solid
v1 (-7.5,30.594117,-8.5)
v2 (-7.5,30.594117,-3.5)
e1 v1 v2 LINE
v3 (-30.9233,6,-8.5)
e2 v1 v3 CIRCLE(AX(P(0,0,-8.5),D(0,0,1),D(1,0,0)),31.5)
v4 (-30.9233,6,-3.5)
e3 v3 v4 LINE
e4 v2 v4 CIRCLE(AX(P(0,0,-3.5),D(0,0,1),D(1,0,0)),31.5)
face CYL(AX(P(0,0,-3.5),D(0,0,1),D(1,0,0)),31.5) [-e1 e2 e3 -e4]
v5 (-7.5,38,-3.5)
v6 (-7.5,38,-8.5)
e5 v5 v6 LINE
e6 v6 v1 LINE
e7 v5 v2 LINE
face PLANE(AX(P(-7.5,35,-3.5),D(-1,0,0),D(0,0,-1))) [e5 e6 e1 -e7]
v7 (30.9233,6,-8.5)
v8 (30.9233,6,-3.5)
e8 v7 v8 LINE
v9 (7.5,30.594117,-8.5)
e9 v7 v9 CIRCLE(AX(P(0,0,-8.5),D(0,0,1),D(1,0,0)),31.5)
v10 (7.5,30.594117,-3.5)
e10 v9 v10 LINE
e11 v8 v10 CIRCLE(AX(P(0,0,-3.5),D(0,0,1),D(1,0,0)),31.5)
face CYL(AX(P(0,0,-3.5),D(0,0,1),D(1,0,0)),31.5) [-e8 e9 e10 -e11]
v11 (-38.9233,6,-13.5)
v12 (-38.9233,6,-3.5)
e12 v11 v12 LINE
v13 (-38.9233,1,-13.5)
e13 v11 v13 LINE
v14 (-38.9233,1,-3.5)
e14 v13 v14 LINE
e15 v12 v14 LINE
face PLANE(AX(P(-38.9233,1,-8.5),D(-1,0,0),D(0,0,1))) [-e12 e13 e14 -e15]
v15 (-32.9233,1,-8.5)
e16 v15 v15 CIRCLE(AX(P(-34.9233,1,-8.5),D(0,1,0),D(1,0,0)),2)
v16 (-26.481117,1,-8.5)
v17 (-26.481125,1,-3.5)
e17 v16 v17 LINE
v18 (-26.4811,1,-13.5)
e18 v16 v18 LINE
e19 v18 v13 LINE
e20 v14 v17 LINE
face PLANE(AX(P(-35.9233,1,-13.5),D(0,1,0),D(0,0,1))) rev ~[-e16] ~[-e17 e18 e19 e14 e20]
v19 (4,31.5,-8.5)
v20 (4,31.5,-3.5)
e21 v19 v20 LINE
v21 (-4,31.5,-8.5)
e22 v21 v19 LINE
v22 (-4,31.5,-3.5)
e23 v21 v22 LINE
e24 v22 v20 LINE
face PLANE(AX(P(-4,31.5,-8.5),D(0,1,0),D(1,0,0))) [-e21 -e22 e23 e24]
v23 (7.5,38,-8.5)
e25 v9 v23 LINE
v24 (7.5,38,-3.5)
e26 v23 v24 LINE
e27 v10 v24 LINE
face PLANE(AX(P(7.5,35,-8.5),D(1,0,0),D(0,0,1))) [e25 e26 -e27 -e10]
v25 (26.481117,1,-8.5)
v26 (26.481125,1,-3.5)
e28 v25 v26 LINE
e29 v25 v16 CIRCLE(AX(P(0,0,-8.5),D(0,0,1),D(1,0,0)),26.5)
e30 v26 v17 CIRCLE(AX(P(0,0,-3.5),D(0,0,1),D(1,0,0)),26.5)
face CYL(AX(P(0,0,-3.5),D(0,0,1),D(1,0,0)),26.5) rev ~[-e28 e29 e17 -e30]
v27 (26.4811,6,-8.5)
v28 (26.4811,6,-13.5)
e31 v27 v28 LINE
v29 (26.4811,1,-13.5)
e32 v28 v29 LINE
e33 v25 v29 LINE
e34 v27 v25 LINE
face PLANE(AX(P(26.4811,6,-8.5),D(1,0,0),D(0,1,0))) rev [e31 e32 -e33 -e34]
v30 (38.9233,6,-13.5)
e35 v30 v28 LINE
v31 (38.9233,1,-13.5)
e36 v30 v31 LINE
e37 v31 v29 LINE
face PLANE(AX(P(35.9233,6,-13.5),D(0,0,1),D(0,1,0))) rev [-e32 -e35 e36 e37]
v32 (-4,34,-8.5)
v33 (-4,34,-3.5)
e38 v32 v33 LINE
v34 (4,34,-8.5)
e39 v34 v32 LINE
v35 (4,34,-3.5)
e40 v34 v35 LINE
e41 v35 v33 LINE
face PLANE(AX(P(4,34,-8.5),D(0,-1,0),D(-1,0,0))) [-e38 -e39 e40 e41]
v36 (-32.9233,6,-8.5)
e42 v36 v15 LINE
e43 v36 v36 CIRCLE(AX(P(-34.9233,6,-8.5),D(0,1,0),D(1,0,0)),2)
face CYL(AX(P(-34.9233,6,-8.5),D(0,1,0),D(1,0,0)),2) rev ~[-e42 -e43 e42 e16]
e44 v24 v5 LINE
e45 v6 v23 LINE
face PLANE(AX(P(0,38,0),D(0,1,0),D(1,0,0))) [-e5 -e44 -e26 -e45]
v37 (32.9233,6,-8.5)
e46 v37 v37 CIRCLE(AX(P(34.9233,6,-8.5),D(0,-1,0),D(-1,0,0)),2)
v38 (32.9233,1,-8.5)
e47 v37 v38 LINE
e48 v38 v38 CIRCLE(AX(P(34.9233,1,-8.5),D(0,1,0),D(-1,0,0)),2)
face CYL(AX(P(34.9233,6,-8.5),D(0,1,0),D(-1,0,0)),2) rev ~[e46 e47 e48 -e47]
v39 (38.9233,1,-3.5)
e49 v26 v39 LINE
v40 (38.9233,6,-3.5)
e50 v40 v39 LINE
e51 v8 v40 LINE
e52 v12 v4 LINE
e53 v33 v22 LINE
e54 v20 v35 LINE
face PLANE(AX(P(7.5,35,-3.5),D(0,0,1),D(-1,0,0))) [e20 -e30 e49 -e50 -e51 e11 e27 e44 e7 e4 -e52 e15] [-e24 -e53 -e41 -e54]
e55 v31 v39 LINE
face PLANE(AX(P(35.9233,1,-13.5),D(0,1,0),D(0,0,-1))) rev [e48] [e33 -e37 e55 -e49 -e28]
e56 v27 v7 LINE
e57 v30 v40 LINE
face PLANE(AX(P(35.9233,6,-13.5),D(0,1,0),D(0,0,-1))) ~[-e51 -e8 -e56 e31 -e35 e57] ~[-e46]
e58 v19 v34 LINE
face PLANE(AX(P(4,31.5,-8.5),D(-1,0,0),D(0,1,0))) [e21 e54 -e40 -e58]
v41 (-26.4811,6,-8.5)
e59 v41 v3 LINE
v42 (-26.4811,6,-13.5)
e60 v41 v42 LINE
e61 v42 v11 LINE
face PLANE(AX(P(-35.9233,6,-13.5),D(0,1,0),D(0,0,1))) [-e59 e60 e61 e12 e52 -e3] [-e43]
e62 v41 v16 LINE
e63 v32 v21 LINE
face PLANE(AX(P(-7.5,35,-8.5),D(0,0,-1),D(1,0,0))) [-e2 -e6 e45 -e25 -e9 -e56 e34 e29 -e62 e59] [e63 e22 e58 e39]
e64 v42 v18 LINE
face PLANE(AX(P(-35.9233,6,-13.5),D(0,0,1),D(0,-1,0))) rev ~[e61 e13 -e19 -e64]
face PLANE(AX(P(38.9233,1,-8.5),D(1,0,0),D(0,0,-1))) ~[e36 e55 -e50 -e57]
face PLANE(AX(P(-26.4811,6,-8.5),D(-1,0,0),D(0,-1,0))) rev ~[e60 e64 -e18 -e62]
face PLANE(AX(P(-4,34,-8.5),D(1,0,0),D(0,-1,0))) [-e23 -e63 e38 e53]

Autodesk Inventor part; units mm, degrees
ref_plane "YZ Plane" through (0, 0, 0) normal (1, 0, 0) x (0, 1, 0)
ref_plane "Work Plane1" through (0, 0, -3.5) normal (0, 0, 1) x (1, 0, 0)
sketch "Sketch1" plane through (0, 0, -3.5) normal (0, 0, 1) x (1, 0, 0)
  circle A0 centre (0, 0) radius 26.5 projected
  circle A1 centre (0, 0) radius 31.5
  point P0 (0, 0)
  dimension "d1" = 5
extrude "Extrusion1" add sketch "Sketch1" against normal blind 5
sketch "Sketch5" plane through (0, 0, 0) normal (1, 0, 0) x (0, 1, 0)
  line L0 (6.0883, 0) -> (4.0883, 0)
  line L1 (4.0883, 0) -> (4.0883, -15.2563)
  line L2 (4.0883, -15.2563) -> (6.0883, -15.2563)
  line L3 (6.0883, -15.2563) -> (6.0883, 0)
  line L4 (-1, 2.6587) -> (1, 2.6587)
  line L5 (1, 2.6587) -> (1, -12.1151)
  line L6 (1, -12.1151) -> (-1, -12.1151)
  line L7 (-1, -12.1151) -> (-1, 2.6587)
  point P0 (0, 0)
  dimension "d4" = 2
  dimension "d5" = 2
  dimension "d6" = 1
extrude "Extrusion2" cut sketch "Sketch5" along normal through all both and the other way through all contours L4 L5 L6 L7
sketch "Sketch6" plane through (0, 0, -8.5) normal (0, 0, -1) x (-1, 0, 0)
  line L0 (26.4811, 1) -> (31.4841, 1) projected
  line L1 (-31.4841, 1) -> (-26.4811, 1) projected
  arc A0 (26.4811, 1) -> (-26.4811, 1) centre (0, 0) ccw projected
  line L2 (26.4811, 1) -> (31.4841, 1) projected
  arc A1 (31.4841, 1) -> (-31.4841, 1) centre (0, 0) ccw projected
  line L3 (-53.7275, 6) -> (74.5535, 6)
  line L4 (26.4811, 1) -> (30.9233, 1)
  line L5 (30.9233, 1) -> (30.9233, 6)
  line L6 (30.9233, 6) -> (26.4811, 6)
  line L7 (26.4811, 6) -> (26.4811, 1)
  dimension "d9" = 5
extrude "Extrusion3" add sketch "Sketch6" along normal blind 5 contours L7 L3 L5 L0
sketch "Sketch7" plane through (-30.9233, 1, -8.5) normal (-1, 0, 0) x (0, 0, 1)
  line L0 (0, 5) -> (0, 0) projected
  line L1 (0, 5) -> (-5, 5) projected
  line L2 (-5, 0) -> (-5, 5) projected
  line L3 (0, 0) -> (-5, 0) projected
  point P0 (8.5, -1)
extrude "Extrusion4" add sketch "Sketch7" along normal blind 5
sketch "Sketch8" plane through (-35.9233, 6, -8.5) normal (0, 0, 1) x (1, 0, 0)
  arc A0 (5, 0) -> (4.4392, -5) centre (35.9233, -6) ccw projected
  line L0 (5, 0) -> (0, 0) projected
  line L1 (0, -5) -> (0, 0) projected
  line L2 (4.4392, -5) -> (0, -5) projected
extrude "Extrusion5" add sketch "Sketch8" along normal blind 5
sketch "Sketch9" plane through (-35.9233, 1, -8.5) normal (-1, 0, 0) x (0, 0, 1)
  line L0 (-5, 5) -> (5, 5) projected
  line L1 (-5, 5) -> (-5, 0) projected
  line L2 (-5, 0) -> (5, 0) projected
  line L3 (5, 5) -> (5, 0) projected
  point P0 (8.5, -1)
extrude "Extrusion6" add sketch "Sketch9" along normal blind 3
sketch "Sketch10" plane through (-30.9233, 6, -8.5) normal (0, 1, 0) x (1, 0, 0)
  circle A0 centre (-4, 0) radius 2
  point P0 (30.9233, -8.5)
  dimension "d18" = 4
extrude "Extrusion7" cut sketch "Sketch10" against normal up to next
mirror "Mirror1" about plane through (0, 0, 0) normal (1, 0, 0) of "Extrusion3", "Extrusion4", "Extrusion5", "Extrusion6", "Extrusion7"
sketch "Sketch11" plane through (0, 0, -8.5) normal (0, 0, -1) x (-1, 0, 0)
  line L0 (31.4841, -1) -> (26.4811, -1) projected
  arc A0 (-26.4811, -1) -> (26.4811, -1) centre (0, 0) ccw projected
  line L1 (-26.4811, -1) -> (-31.4841, -1) projected
  arc A1 (-31.4841, -1) -> (31.4841, -1) centre (0, 0) ccw projected
extrude "Extrusion8" cut sketch "Sketch11" against normal through all
ref_plane "Work Plane2" through (0, 35, 0) normal (0, 1, 0) x (-1, 0, 0)
sketch "Sketch12" plane through (0, 35, 0) normal (0, 1, 0) x (-1, 0, 0)
  line L0 (-30.9233, -3.5) -> (30.9233, -3.5) construction
  line L1 (-30.9233, -8.5) -> (30.9233, -8.5) construction
  line L2 (-7.5, -3.5) -> (7.5, -3.5)
  line L3 (7.5, -3.5) -> (7.5, -8.5)
  line L4 (7.5, -8.5) -> (-7.5, -8.5)
  line L5 (-7.5, -8.5) -> (-7.5, -3.5)
  point P0 (0, 0)
  dimension "d24" = 15
  dimension "d25" = 7.5
extrude "Extrusion9" add sketch "Sketch12" against normal up to next
sketch "Sketch13" plane through (0, 35, 0) normal (0, 1, 0) x (1, 0, 0)
  line L0 (7.5, 3.5) -> (-7.5, 3.5) projected
  line L1 (7.5, 8.5) -> (7.5, 3.5) projected
  line L2 (-7.5, 8.5) -> (7.5, 8.5) projected
  line L3 (-7.5, 3.5) -> (-7.5, 8.5) projected
  point P0 (0, 0)
extrude "Extrusion10" add sketch "Sketch13" along normal blind 3
sketch "Sketch14" plane through (0, 0, -8.5) normal (0, 0, -1) x (-1, 0, 0)
  line L0 (-7.5, 38) -> (7.5, 38) projected
  arc A0 (-7.5, 30.5941) -> (-30.9233, 6) centre (0, 0) ccw projected
  line L1 (-4, 34) -> (4, 34)
  line L2 (4, 34) -> (4, 31.5)
  line L3 (4, 31.5) -> (-4, 31.5)
  line L4 (-4, 31.5) -> (-4, 34)
  dimension "d30" = 8
  dimension "d31" = 2.5
  dimension "d32" = 4
  dimension "d33" = 4
extrude "Extrusion11" cut sketch "Sketch14" against normal blind 5
properties part number "CanBracket"
